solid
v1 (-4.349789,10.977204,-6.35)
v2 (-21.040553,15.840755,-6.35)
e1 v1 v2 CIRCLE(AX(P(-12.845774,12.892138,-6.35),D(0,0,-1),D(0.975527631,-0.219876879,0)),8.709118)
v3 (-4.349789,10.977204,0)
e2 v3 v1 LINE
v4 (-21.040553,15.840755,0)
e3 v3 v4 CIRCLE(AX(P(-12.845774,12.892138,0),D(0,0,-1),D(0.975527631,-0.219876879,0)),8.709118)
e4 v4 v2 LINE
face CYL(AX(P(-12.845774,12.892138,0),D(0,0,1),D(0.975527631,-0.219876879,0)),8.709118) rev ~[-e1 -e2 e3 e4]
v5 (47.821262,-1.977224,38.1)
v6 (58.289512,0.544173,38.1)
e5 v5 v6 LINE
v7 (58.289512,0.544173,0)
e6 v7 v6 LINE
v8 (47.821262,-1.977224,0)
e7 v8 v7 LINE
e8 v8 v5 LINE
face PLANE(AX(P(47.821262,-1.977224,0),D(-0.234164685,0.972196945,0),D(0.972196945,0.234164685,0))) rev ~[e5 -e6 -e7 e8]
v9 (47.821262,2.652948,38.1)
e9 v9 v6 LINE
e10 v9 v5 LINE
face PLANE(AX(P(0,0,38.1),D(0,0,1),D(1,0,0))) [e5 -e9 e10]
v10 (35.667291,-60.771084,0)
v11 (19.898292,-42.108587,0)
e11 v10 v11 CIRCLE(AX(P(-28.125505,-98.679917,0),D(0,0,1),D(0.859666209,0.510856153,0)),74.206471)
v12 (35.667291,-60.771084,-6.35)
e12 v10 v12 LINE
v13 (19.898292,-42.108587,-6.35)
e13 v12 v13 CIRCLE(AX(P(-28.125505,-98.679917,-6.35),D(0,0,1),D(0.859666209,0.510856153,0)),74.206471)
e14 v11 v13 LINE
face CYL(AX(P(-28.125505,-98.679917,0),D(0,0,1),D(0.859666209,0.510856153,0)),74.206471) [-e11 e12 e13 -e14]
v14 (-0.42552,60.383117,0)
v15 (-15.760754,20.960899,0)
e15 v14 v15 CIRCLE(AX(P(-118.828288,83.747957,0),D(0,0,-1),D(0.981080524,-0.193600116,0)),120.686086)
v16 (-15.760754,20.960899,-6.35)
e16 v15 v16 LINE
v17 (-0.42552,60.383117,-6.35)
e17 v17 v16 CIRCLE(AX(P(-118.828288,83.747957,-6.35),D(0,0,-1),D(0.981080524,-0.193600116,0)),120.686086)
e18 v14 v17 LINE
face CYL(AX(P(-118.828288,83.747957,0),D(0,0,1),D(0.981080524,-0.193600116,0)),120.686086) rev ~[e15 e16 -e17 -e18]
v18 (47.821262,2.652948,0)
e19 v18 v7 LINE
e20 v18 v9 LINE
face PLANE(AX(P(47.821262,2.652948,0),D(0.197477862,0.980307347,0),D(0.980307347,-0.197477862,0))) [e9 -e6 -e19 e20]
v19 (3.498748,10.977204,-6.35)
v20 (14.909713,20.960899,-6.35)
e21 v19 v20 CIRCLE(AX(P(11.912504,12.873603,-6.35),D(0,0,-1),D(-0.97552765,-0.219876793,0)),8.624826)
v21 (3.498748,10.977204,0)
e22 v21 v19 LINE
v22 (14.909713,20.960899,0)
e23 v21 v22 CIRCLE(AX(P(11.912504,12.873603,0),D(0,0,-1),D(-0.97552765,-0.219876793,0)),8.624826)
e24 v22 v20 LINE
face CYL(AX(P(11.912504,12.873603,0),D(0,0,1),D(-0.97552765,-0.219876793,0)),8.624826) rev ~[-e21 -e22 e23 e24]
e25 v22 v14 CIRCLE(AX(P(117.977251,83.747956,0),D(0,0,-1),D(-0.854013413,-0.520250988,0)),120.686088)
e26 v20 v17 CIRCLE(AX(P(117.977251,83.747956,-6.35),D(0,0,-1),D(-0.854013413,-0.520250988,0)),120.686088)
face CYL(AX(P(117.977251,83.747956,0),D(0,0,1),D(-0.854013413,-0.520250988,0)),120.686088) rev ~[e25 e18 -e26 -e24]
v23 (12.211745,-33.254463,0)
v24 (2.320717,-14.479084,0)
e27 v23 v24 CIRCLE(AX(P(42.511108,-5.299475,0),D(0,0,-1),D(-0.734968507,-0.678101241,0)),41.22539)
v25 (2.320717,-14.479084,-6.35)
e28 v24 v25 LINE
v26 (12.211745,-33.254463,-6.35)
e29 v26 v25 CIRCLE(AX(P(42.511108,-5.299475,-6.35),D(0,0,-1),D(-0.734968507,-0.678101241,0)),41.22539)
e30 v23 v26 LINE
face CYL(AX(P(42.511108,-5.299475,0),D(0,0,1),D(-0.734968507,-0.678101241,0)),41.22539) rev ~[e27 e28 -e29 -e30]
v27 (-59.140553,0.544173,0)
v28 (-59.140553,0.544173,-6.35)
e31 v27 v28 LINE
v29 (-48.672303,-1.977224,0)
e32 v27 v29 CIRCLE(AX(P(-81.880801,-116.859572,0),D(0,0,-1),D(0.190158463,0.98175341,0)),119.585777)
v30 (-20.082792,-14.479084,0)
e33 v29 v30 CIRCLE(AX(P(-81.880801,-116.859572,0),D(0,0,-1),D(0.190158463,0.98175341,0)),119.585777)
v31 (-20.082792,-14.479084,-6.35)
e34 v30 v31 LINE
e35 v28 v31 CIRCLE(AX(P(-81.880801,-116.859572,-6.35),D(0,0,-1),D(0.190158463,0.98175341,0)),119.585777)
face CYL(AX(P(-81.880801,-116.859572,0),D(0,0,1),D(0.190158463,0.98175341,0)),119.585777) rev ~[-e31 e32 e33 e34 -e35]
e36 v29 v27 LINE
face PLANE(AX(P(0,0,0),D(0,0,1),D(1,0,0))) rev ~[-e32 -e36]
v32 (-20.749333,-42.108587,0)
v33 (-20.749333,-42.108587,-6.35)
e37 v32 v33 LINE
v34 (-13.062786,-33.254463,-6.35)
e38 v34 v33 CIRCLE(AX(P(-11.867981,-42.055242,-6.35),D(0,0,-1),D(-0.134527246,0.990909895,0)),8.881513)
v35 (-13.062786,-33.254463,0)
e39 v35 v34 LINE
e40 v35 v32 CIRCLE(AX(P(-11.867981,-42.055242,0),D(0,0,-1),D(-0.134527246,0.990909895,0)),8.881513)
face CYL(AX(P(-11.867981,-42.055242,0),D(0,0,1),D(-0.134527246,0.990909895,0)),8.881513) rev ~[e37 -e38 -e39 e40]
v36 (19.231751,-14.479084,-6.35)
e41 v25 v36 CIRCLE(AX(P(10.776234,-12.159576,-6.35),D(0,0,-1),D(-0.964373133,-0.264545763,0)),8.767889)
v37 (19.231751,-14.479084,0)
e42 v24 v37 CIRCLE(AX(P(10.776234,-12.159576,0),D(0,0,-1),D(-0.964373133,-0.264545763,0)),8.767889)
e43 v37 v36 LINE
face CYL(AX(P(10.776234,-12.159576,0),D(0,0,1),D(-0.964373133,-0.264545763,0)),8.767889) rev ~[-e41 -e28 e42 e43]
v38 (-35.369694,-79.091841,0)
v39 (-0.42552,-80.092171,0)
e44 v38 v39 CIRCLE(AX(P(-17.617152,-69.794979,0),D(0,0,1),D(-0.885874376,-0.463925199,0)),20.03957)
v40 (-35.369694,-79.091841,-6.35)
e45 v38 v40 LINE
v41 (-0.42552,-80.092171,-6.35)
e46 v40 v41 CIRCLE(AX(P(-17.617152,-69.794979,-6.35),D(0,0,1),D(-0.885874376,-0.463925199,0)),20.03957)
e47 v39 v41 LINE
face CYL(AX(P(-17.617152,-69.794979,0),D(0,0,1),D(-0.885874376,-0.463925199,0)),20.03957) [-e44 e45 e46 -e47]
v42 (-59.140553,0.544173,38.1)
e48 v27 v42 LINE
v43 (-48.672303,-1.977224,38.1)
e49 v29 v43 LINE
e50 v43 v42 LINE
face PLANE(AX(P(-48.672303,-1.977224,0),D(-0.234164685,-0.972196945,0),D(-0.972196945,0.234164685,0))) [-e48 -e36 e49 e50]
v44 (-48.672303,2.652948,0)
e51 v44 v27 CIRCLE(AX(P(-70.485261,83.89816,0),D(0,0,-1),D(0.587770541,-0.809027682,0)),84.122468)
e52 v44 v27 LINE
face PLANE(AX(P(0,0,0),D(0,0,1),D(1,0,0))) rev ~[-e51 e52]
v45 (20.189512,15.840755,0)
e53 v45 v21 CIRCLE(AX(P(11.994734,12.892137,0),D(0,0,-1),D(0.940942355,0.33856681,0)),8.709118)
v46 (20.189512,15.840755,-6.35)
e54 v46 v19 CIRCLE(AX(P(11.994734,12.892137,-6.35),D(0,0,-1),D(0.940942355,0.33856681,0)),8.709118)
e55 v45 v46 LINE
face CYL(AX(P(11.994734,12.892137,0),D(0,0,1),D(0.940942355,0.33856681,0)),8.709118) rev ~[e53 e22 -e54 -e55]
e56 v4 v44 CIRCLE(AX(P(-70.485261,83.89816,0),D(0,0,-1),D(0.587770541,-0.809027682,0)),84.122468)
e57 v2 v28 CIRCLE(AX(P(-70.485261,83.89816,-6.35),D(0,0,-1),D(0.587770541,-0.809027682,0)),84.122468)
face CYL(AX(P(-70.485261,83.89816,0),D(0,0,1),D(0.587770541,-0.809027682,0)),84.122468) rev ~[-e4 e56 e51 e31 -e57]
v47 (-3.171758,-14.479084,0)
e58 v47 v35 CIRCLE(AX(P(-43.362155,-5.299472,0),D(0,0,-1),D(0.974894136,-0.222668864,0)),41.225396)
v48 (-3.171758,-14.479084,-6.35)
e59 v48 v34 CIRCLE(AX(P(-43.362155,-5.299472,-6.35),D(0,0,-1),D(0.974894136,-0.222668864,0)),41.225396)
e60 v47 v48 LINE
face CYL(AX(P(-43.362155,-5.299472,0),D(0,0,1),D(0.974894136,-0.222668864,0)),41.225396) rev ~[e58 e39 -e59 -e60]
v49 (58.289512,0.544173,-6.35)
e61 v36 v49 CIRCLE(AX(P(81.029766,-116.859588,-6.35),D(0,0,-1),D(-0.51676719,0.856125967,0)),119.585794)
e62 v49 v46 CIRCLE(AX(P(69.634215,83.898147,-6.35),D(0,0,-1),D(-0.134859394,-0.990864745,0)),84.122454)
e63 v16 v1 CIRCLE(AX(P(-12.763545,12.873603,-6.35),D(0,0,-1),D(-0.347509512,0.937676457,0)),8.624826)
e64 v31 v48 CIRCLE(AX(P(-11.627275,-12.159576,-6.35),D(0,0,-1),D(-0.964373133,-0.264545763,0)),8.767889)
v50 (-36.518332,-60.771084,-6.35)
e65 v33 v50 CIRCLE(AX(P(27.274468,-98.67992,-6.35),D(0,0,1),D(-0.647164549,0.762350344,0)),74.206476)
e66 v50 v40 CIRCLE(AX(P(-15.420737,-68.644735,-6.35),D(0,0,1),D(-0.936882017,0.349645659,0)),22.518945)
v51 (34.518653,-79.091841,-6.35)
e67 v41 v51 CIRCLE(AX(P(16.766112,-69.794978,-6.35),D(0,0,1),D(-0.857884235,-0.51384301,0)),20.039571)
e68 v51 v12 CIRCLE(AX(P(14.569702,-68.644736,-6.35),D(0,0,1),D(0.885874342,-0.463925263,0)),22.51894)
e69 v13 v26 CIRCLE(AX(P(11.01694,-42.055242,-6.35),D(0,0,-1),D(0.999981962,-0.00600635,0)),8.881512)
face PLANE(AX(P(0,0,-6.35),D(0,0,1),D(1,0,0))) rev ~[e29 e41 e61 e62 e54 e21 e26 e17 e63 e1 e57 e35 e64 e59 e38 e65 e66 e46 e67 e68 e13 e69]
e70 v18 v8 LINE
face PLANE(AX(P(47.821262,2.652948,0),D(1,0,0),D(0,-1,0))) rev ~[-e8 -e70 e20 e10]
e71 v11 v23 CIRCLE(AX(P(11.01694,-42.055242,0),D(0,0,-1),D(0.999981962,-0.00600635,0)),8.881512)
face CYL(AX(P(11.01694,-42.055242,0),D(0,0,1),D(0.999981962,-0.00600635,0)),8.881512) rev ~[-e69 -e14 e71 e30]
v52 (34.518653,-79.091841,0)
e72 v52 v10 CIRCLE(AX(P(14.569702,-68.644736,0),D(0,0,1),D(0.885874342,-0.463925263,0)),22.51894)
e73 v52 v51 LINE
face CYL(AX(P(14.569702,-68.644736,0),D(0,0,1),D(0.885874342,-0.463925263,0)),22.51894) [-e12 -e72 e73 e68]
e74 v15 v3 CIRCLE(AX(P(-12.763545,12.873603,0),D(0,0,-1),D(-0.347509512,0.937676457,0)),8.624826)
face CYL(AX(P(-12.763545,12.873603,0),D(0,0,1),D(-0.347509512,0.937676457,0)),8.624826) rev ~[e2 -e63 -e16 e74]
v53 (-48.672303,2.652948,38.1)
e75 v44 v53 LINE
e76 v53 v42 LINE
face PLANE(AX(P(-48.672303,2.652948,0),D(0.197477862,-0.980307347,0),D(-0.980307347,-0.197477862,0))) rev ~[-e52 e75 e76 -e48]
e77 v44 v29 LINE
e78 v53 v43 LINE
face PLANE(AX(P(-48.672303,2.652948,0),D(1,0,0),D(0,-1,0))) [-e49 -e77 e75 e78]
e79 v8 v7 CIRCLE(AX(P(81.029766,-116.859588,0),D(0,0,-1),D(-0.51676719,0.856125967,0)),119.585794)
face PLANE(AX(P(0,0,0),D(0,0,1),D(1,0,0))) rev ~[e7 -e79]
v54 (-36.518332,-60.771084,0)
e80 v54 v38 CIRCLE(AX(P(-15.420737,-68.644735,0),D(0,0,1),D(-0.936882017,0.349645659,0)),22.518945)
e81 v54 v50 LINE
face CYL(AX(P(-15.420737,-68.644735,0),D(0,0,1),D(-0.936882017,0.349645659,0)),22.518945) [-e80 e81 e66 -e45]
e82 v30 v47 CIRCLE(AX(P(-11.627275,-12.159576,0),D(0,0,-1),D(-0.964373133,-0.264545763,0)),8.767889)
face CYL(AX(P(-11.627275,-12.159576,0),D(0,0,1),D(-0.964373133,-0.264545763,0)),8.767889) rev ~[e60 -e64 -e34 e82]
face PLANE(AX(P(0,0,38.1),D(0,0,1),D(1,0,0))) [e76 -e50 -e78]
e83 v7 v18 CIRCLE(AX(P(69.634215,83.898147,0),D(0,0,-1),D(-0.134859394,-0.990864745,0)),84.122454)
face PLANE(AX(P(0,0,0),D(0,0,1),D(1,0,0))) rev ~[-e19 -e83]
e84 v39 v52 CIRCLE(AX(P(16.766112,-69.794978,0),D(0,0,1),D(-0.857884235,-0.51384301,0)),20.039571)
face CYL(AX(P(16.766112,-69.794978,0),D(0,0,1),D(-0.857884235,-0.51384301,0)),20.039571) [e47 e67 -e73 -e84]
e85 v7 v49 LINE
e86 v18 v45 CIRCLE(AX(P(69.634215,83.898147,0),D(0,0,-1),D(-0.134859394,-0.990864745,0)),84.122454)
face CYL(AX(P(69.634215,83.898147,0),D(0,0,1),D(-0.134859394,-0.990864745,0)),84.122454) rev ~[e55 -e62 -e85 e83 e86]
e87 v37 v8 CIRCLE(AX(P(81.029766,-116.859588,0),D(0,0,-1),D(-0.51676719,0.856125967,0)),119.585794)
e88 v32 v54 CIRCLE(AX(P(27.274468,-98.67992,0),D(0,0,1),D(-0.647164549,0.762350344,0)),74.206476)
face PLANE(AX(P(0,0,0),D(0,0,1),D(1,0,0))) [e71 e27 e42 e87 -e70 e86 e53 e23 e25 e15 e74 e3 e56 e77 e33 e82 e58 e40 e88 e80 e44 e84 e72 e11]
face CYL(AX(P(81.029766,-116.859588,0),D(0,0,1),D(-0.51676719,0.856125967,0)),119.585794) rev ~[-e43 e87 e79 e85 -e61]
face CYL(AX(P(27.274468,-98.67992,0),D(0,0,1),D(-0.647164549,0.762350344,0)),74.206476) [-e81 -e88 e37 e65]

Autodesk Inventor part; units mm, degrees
sketch "Sketch1" plane through (0, 0, 0) normal (0, 0, 1) x (1, 0, 0)
  line L0 (-63.346699, 63.7292) -> (61.928792, 63.7292) construction
  line L1 (61.928792, 63.7292) -> (61.928792, -93.080155) construction
  line L2 (61.928792, -93.080155) -> (-63.346699, -93.080155) construction
  line L3 (-63.346699, -93.080155) -> (-63.346699, 63.7292) construction
  line L4 (-0.42552, 162.447522) -> (-0.42552, -218.552478) construction
  line L5 (-278.922376, 0) -> (102.077624, 0) construction
  line L6 (-278.922376, 0) -> (-0.42552, 162.447522) construction
  arc A0 (58.289512, 0.544173) -> (19.231751, -14.479084) centre (81.029762, -116.85958) ccw
  arc A1 (20.189512, 15.840755) -> (58.289512, 0.544173) centre (69.634217, 83.898154) ccw
  arc A2 (3.498748, 10.977204) -> (20.189512, 15.840755) centre (11.994733, 12.892137) ccw
  arc A3 (14.909713, 20.960899) -> (3.498748, 10.977204) centre (11.912504, 12.873603) ccw
  arc A4 (-0.42552, 60.383117) -> (14.909713, 20.960899) centre (117.977264, 83.747962) ccw
  arc A5 (-20.082792, -14.479084) -> (-59.140553, 0.544173) centre (-81.880803, -116.85958) ccw
  arc A6 (-59.140553, 0.544173) -> (-21.040553, 15.840755) centre (-70.485258, 83.898154) ccw
  arc A7 (-21.040553, 15.840755) -> (-4.349789, 10.977204) centre (-12.845774, 12.892137) ccw
  arc A8 (-4.349789, 10.977204) -> (-15.760754, 20.960899) centre (-12.763545, 12.873603) ccw
  arc A9 (-15.760754, 20.960899) -> (-0.42552, 60.383117) centre (-118.828305, 83.747962) ccw
  arc A10 (-3.171758, -14.479084) -> (-20.082792, -14.479084) centre (-11.627275, -12.159576) ccw
  arc A11 (-20.749333, -42.108587) -> (-13.062786, -33.254463) centre (-11.867981, -42.055242) ccw
  arc A12 (-13.062786, -33.254463) -> (-3.171758, -14.479084) centre (-43.362152, -5.299473) ccw
  arc A13 (-35.369694, -79.091841) -> (-0.42552, -80.092171) centre (-17.617152, -69.794979) ccw
  arc A14 (-36.518332, -60.771084) -> (-35.369694, -79.091841) centre (-15.42074, -68.644735) ccw
  arc A15 (-20.749333, -42.108587) -> (-36.518332, -60.771084) centre (27.274466, -98.679918) ccw
  arc A16 (19.231751, -14.479084) -> (2.320717, -14.479084) centre (10.776234, -12.159576) ccw
  arc A17 (12.211745, -33.254463) -> (19.898292, -42.108587) centre (11.01694, -42.055242) ccw
  arc A18 (2.320717, -14.479084) -> (12.211745, -33.254463) centre (42.511111, -5.299473) ccw
  arc A19 (-0.42552, -80.092171) -> (34.518653, -79.091841) centre (16.766111, -69.794979) ccw
  arc A20 (34.518653, -79.091841) -> (35.667291, -60.771084) centre (14.569699, -68.644735) ccw
  arc A21 (35.667291, -60.771084) -> (19.898292, -42.108587) centre (-28.125507, -98.679918) ccw
  arc A22 (14.617916, 21.196775) -> (3.374856, 10.94928) centre (11.912504, 12.873603) ccw
  arc A23 (3.374856, 10.94928) -> (20.435276, 15.506372) centre (11.994733, 12.892137) ccw
  arc A24 (20.435276, 15.506372) -> (57.52626, 0.523283) centre (69.634217, 83.898154) ccw
  arc A25 (57.52626, 0.523283) -> (19.431403, -14.210696) centre (81.029762, -116.85958) ccw
  arc A26 (19.431403, -14.210696) -> (2.197514, -14.510029) centre (10.776234, -12.159576) ccw
  arc A27 (2.197514, -14.510029) -> (11.888162, -33.088957) centre (42.511111, -5.299473) ccw
  arc A28 (11.888162, -33.088957) -> (20.019639, -42.378822) centre (11.01694, -42.055242) ccw
  arc A29 (35.552285, -60.826156) -> (20.019639, -42.378822) centre (-28.125507, -98.679918) ccw
  arc A30 (34.406147, -79.032922) -> (35.552285, -60.826156) centre (14.569699, -68.644735) ccw
  arc A31 (-0.42552, -79.842777) -> (34.406147, -79.032922) centre (16.766111, -69.794979) ccw
  arc A32 (-35.257188, -79.032922) -> (-0.42552, -79.842777) centre (-17.617152, -69.794979) ccw
  arc A33 (-36.403326, -60.826156) -> (-35.257188, -79.032922) centre (-15.42074, -68.644735) ccw
  arc A34 (-20.87068, -42.378822) -> (-36.403326, -60.826156) centre (27.274466, -98.679918) ccw
  arc A35 (-20.87068, -42.378822) -> (-12.739203, -33.088957) centre (-11.867981, -42.055242) ccw
  arc A36 (-12.739203, -33.088957) -> (-3.048555, -14.510029) centre (-43.362152, -5.299473) ccw
  arc A37 (-3.048555, -14.510029) -> (-20.282444, -14.210696) centre (-11.627275, -12.159576) ccw
  arc A38 (-20.282444, -14.210696) -> (-58.377301, 0.523283) centre (-81.880803, -116.85958) ccw
  arc A39 (-58.377301, 0.523283) -> (-21.286317, 15.506372) centre (-70.485258, 83.898154) ccw
  arc A40 (-21.286317, 15.506372) -> (-4.225897, 10.94928) centre (-12.845774, 12.892137) ccw
  arc A41 (-4.225897, 10.94928) -> (-15.468957, 21.196775) centre (-12.763545, 12.873603) ccw
  arc A42 (-15.468957, 21.196775) -> (-0.42552, 59.735749) centre (-118.828305, 83.747962) ccw
  arc A43 (-0.42552, 59.735749) -> (14.617916, 21.196775) centre (117.977264, 83.747962) ccw
  arc A44 (2.631504, 10.781734) -> (21.550603, 13.791702) centre (11.994733, 12.892137) ccw
  arc A45 (13.063953, 22.317492) -> (2.631504, 10.781734) centre (11.912504, 12.873603) ccw
  arc A46 (-0.42552, 56.156547) -> (13.063953, 22.317492) centre (117.977264, 83.747962) ccw
  arc A47 (-13.914994, 22.317492) -> (-0.42552, 56.156547) centre (-118.828305, 83.747962) ccw
  arc A48 (-3.482545, 10.781734) -> (-13.914994, 22.317492) centre (-12.763545, 12.873603) ccw
  arc A49 (-22.401644, 13.791702) -> (-3.482545, 10.781734) centre (-12.845774, 12.892137) ccw
  arc A50 (-54.360773, 0.4299) -> (-22.401644, 13.791702) centre (-70.485258, 83.898154) ccw
  arc A51 (-21.26647, -12.743891) -> (-54.360773, 0.4299) centre (-81.880803, -116.85958) ccw
  arc A52 (-2.309275, -14.695398) -> (-21.26647, -12.743891) centre (-11.627275, -12.159576) ccw
  arc A53 (-11.05737, -32.318413) -> (-2.309275, -14.695398) centre (-43.362152, -5.299473) ccw
  arc A54 (-21.461702, -43.905491) -> (-11.05737, -32.318413) centre (-11.867981, -42.055242) ccw
  arc A55 (-21.461702, -43.905491) -> (-35.713006, -61.156188) centre (27.274466, -98.679918) ccw
  arc A56 (-35.713006, -61.156188) -> (-34.582151, -78.679411) centre (-15.42074, -68.644735) ccw
  arc A57 (-34.582151, -78.679411) -> (-0.42552, -78.232522) centre (-17.617152, -69.794979) ccw
  arc A58 (-0.42552, -78.232522) -> (33.731111, -78.679411) centre (16.766111, -69.794979) ccw
  arc A59 (33.731111, -78.679411) -> (34.861965, -61.156188) centre (14.569699, -68.644735) ccw
  arc A60 (34.861965, -61.156188) -> (20.610662, -43.905491) centre (-28.125507, -98.679918) ccw
  arc A61 (10.206329, -32.318413) -> (20.610662, -43.905491) centre (11.01694, -42.055242) ccw
  arc A62 (1.458234, -14.695398) -> (10.206329, -32.318413) centre (42.511111, -5.299473) ccw
  arc A63 (20.415429, -12.743891) -> (1.458234, -14.695398) centre (10.776234, -12.159576) ccw
  arc A64 (53.509732, 0.4299) -> (20.415429, -12.743891) centre (81.029762, -116.85958) ccw
  arc A65 (21.550603, 13.791702) -> (53.509732, 0.4299) centre (69.634217, 83.898154) ccw
  point P0 (0, 0)
  point P1 (-15.887651, 20.960899)
  point P2 (3.820531, 5.071329)
  dimension "d3" = 381
  dimension "d6" = 381
  dimension "d11" = 38.1
  dimension "d18" = 0.127
  dimension "d19" = 0.762
sketch "Sketch1 outline for Extrusion1" plane through (0, 0, 0) normal (0, 0, 1) x (1, 0, 0)
  arc A0 (-20.749333, -42.108587) -> (-36.518332, -60.771084) centre (27.274466, -98.679918) ccw
  arc A1 (-13.062786, -33.254463) -> (-20.749333, -42.108587) centre (-11.867981, -42.055242) cw
  arc A2 (-3.171758, -14.479084) -> (-13.062786, -33.254463) centre (-43.362152, -5.299473) cw
  arc A3 (-20.082792, -14.479084) -> (-3.171758, -14.479084) centre (-11.627275, -12.159576) cw
  arc A4 (-59.140553, 0.544173) -> (-20.082792, -14.479084) centre (-81.880803, -116.85958) cw
  arc A5 (-21.040553, 15.840755) -> (-59.140553, 0.544173) centre (-70.485258, 83.898154) cw
  arc A6 (-4.349789, 10.977204) -> (-21.040553, 15.840755) centre (-12.845774, 12.892137) cw
  arc A7 (-15.760754, 20.960899) -> (-4.349789, 10.977204) centre (-12.763545, 12.873603) cw
  arc A8 (-0.42552, 60.383117) -> (-15.760754, 20.960899) centre (-118.828305, 83.747962) cw
  arc A9 (14.909713, 20.960899) -> (-0.42552, 60.383117) centre (117.977264, 83.747962) cw
  arc A10 (3.498748, 10.977204) -> (14.909713, 20.960899) centre (11.912504, 12.873603) cw
  arc A11 (20.189512, 15.840755) -> (3.498748, 10.977204) centre (11.994733, 12.892137) cw
  arc A12 (58.289512, 0.544173) -> (20.189512, 15.840755) centre (69.634217, 83.898154) cw
  arc A13 (19.231751, -14.479084) -> (58.289512, 0.544173) centre (81.029762, -116.85958) cw
  arc A14 (2.320717, -14.479084) -> (19.231751, -14.479084) centre (10.776234, -12.159576) cw
  arc A15 (12.211745, -33.254463) -> (2.320717, -14.479084) centre (42.511111, -5.299473) cw
  arc A16 (19.898292, -42.108587) -> (12.211745, -33.254463) centre (11.01694, -42.055242) cw
  arc A17 (35.667291, -60.771084) -> (19.898292, -42.108587) centre (-28.125507, -98.679918) ccw
  arc A18 (34.518653, -79.091841) -> (35.667291, -60.771084) centre (14.569699, -68.644735) ccw
  arc A19 (-0.42552, -80.092171) -> (34.518653, -79.091841) centre (16.766111, -69.794979) ccw
  arc A20 (-35.369694, -79.091841) -> (-0.42552, -80.092171) centre (-17.617152, -69.794979) ccw
  arc A21 (-36.518332, -60.771084) -> (-35.369694, -79.091841) centre (-15.42074, -68.644735) ccw
extrude "Extrusion1" add sketch "Sketch1 outline for Extrusion1" against normal blind 6.35
sketch "Sketch2" plane through (0, 0, 0) normal (0, 1, 0) x (-1, 0, 0)
  point P0 (0, 0)
sketch "Sketch3" plane through (0, 0, 0) normal (0, 0, 1) x (1, 0, 0)
  arc A0 (20.189512, 15.840755) -> (58.289512, 0.544173) centre (69.634217, 83.898154) ccw
  arc A1 (58.289512, 0.544173) -> (19.231751, -14.479084) centre (81.029762, -116.85958) ccw
  line L0 (47.821262, 2.652948) -> (47.821262, -1.977224)
  line L1 (47.821262, -1.977224) -> (58.289512, 0.544173)
  line L2 (47.821262, 2.652948) -> (58.289512, 0.544173)
  arc A2 (-0.42552, 60.383117) -> (14.909713, 20.960899) centre (117.977264, 83.747962) ccw construction
  line L3 (-0.42552, 60.383117) -> (-0.42552, -89.381829) construction
  line L4 (-48.672303, 2.652948) -> (-48.672303, -1.977224)
  line L5 (-48.672303, -1.977224) -> (-59.140553, 0.544173)
  line L6 (-48.672303, 2.652948) -> (-59.140553, 0.544173)
  point P0 (0, 0)
extrude "Extrusion2" add sketch "Sketch3" along normal blind 38.1
sketch "Sketch4" plane through (0, 0, 0) normal (1, 0, 0) x (0, 1, 0)
  line L0 (0.544173, 0) -> (0.544173, 38.1)
  point P0 (0, 0)
sketch "Sketch5" plane through (0, 0, 0) normal (0, 1, 0) x (-1, 0, 0)
  point P0 (0, 0)
  point P1 (0, 12.7)
sketch "Sketch6" plane through (0, 0, -6.35) normal (0, 0, -1) x (-1, 0, 0)
  point P0 (0, 0)
properties part number "Nobody Emblem Ring"
